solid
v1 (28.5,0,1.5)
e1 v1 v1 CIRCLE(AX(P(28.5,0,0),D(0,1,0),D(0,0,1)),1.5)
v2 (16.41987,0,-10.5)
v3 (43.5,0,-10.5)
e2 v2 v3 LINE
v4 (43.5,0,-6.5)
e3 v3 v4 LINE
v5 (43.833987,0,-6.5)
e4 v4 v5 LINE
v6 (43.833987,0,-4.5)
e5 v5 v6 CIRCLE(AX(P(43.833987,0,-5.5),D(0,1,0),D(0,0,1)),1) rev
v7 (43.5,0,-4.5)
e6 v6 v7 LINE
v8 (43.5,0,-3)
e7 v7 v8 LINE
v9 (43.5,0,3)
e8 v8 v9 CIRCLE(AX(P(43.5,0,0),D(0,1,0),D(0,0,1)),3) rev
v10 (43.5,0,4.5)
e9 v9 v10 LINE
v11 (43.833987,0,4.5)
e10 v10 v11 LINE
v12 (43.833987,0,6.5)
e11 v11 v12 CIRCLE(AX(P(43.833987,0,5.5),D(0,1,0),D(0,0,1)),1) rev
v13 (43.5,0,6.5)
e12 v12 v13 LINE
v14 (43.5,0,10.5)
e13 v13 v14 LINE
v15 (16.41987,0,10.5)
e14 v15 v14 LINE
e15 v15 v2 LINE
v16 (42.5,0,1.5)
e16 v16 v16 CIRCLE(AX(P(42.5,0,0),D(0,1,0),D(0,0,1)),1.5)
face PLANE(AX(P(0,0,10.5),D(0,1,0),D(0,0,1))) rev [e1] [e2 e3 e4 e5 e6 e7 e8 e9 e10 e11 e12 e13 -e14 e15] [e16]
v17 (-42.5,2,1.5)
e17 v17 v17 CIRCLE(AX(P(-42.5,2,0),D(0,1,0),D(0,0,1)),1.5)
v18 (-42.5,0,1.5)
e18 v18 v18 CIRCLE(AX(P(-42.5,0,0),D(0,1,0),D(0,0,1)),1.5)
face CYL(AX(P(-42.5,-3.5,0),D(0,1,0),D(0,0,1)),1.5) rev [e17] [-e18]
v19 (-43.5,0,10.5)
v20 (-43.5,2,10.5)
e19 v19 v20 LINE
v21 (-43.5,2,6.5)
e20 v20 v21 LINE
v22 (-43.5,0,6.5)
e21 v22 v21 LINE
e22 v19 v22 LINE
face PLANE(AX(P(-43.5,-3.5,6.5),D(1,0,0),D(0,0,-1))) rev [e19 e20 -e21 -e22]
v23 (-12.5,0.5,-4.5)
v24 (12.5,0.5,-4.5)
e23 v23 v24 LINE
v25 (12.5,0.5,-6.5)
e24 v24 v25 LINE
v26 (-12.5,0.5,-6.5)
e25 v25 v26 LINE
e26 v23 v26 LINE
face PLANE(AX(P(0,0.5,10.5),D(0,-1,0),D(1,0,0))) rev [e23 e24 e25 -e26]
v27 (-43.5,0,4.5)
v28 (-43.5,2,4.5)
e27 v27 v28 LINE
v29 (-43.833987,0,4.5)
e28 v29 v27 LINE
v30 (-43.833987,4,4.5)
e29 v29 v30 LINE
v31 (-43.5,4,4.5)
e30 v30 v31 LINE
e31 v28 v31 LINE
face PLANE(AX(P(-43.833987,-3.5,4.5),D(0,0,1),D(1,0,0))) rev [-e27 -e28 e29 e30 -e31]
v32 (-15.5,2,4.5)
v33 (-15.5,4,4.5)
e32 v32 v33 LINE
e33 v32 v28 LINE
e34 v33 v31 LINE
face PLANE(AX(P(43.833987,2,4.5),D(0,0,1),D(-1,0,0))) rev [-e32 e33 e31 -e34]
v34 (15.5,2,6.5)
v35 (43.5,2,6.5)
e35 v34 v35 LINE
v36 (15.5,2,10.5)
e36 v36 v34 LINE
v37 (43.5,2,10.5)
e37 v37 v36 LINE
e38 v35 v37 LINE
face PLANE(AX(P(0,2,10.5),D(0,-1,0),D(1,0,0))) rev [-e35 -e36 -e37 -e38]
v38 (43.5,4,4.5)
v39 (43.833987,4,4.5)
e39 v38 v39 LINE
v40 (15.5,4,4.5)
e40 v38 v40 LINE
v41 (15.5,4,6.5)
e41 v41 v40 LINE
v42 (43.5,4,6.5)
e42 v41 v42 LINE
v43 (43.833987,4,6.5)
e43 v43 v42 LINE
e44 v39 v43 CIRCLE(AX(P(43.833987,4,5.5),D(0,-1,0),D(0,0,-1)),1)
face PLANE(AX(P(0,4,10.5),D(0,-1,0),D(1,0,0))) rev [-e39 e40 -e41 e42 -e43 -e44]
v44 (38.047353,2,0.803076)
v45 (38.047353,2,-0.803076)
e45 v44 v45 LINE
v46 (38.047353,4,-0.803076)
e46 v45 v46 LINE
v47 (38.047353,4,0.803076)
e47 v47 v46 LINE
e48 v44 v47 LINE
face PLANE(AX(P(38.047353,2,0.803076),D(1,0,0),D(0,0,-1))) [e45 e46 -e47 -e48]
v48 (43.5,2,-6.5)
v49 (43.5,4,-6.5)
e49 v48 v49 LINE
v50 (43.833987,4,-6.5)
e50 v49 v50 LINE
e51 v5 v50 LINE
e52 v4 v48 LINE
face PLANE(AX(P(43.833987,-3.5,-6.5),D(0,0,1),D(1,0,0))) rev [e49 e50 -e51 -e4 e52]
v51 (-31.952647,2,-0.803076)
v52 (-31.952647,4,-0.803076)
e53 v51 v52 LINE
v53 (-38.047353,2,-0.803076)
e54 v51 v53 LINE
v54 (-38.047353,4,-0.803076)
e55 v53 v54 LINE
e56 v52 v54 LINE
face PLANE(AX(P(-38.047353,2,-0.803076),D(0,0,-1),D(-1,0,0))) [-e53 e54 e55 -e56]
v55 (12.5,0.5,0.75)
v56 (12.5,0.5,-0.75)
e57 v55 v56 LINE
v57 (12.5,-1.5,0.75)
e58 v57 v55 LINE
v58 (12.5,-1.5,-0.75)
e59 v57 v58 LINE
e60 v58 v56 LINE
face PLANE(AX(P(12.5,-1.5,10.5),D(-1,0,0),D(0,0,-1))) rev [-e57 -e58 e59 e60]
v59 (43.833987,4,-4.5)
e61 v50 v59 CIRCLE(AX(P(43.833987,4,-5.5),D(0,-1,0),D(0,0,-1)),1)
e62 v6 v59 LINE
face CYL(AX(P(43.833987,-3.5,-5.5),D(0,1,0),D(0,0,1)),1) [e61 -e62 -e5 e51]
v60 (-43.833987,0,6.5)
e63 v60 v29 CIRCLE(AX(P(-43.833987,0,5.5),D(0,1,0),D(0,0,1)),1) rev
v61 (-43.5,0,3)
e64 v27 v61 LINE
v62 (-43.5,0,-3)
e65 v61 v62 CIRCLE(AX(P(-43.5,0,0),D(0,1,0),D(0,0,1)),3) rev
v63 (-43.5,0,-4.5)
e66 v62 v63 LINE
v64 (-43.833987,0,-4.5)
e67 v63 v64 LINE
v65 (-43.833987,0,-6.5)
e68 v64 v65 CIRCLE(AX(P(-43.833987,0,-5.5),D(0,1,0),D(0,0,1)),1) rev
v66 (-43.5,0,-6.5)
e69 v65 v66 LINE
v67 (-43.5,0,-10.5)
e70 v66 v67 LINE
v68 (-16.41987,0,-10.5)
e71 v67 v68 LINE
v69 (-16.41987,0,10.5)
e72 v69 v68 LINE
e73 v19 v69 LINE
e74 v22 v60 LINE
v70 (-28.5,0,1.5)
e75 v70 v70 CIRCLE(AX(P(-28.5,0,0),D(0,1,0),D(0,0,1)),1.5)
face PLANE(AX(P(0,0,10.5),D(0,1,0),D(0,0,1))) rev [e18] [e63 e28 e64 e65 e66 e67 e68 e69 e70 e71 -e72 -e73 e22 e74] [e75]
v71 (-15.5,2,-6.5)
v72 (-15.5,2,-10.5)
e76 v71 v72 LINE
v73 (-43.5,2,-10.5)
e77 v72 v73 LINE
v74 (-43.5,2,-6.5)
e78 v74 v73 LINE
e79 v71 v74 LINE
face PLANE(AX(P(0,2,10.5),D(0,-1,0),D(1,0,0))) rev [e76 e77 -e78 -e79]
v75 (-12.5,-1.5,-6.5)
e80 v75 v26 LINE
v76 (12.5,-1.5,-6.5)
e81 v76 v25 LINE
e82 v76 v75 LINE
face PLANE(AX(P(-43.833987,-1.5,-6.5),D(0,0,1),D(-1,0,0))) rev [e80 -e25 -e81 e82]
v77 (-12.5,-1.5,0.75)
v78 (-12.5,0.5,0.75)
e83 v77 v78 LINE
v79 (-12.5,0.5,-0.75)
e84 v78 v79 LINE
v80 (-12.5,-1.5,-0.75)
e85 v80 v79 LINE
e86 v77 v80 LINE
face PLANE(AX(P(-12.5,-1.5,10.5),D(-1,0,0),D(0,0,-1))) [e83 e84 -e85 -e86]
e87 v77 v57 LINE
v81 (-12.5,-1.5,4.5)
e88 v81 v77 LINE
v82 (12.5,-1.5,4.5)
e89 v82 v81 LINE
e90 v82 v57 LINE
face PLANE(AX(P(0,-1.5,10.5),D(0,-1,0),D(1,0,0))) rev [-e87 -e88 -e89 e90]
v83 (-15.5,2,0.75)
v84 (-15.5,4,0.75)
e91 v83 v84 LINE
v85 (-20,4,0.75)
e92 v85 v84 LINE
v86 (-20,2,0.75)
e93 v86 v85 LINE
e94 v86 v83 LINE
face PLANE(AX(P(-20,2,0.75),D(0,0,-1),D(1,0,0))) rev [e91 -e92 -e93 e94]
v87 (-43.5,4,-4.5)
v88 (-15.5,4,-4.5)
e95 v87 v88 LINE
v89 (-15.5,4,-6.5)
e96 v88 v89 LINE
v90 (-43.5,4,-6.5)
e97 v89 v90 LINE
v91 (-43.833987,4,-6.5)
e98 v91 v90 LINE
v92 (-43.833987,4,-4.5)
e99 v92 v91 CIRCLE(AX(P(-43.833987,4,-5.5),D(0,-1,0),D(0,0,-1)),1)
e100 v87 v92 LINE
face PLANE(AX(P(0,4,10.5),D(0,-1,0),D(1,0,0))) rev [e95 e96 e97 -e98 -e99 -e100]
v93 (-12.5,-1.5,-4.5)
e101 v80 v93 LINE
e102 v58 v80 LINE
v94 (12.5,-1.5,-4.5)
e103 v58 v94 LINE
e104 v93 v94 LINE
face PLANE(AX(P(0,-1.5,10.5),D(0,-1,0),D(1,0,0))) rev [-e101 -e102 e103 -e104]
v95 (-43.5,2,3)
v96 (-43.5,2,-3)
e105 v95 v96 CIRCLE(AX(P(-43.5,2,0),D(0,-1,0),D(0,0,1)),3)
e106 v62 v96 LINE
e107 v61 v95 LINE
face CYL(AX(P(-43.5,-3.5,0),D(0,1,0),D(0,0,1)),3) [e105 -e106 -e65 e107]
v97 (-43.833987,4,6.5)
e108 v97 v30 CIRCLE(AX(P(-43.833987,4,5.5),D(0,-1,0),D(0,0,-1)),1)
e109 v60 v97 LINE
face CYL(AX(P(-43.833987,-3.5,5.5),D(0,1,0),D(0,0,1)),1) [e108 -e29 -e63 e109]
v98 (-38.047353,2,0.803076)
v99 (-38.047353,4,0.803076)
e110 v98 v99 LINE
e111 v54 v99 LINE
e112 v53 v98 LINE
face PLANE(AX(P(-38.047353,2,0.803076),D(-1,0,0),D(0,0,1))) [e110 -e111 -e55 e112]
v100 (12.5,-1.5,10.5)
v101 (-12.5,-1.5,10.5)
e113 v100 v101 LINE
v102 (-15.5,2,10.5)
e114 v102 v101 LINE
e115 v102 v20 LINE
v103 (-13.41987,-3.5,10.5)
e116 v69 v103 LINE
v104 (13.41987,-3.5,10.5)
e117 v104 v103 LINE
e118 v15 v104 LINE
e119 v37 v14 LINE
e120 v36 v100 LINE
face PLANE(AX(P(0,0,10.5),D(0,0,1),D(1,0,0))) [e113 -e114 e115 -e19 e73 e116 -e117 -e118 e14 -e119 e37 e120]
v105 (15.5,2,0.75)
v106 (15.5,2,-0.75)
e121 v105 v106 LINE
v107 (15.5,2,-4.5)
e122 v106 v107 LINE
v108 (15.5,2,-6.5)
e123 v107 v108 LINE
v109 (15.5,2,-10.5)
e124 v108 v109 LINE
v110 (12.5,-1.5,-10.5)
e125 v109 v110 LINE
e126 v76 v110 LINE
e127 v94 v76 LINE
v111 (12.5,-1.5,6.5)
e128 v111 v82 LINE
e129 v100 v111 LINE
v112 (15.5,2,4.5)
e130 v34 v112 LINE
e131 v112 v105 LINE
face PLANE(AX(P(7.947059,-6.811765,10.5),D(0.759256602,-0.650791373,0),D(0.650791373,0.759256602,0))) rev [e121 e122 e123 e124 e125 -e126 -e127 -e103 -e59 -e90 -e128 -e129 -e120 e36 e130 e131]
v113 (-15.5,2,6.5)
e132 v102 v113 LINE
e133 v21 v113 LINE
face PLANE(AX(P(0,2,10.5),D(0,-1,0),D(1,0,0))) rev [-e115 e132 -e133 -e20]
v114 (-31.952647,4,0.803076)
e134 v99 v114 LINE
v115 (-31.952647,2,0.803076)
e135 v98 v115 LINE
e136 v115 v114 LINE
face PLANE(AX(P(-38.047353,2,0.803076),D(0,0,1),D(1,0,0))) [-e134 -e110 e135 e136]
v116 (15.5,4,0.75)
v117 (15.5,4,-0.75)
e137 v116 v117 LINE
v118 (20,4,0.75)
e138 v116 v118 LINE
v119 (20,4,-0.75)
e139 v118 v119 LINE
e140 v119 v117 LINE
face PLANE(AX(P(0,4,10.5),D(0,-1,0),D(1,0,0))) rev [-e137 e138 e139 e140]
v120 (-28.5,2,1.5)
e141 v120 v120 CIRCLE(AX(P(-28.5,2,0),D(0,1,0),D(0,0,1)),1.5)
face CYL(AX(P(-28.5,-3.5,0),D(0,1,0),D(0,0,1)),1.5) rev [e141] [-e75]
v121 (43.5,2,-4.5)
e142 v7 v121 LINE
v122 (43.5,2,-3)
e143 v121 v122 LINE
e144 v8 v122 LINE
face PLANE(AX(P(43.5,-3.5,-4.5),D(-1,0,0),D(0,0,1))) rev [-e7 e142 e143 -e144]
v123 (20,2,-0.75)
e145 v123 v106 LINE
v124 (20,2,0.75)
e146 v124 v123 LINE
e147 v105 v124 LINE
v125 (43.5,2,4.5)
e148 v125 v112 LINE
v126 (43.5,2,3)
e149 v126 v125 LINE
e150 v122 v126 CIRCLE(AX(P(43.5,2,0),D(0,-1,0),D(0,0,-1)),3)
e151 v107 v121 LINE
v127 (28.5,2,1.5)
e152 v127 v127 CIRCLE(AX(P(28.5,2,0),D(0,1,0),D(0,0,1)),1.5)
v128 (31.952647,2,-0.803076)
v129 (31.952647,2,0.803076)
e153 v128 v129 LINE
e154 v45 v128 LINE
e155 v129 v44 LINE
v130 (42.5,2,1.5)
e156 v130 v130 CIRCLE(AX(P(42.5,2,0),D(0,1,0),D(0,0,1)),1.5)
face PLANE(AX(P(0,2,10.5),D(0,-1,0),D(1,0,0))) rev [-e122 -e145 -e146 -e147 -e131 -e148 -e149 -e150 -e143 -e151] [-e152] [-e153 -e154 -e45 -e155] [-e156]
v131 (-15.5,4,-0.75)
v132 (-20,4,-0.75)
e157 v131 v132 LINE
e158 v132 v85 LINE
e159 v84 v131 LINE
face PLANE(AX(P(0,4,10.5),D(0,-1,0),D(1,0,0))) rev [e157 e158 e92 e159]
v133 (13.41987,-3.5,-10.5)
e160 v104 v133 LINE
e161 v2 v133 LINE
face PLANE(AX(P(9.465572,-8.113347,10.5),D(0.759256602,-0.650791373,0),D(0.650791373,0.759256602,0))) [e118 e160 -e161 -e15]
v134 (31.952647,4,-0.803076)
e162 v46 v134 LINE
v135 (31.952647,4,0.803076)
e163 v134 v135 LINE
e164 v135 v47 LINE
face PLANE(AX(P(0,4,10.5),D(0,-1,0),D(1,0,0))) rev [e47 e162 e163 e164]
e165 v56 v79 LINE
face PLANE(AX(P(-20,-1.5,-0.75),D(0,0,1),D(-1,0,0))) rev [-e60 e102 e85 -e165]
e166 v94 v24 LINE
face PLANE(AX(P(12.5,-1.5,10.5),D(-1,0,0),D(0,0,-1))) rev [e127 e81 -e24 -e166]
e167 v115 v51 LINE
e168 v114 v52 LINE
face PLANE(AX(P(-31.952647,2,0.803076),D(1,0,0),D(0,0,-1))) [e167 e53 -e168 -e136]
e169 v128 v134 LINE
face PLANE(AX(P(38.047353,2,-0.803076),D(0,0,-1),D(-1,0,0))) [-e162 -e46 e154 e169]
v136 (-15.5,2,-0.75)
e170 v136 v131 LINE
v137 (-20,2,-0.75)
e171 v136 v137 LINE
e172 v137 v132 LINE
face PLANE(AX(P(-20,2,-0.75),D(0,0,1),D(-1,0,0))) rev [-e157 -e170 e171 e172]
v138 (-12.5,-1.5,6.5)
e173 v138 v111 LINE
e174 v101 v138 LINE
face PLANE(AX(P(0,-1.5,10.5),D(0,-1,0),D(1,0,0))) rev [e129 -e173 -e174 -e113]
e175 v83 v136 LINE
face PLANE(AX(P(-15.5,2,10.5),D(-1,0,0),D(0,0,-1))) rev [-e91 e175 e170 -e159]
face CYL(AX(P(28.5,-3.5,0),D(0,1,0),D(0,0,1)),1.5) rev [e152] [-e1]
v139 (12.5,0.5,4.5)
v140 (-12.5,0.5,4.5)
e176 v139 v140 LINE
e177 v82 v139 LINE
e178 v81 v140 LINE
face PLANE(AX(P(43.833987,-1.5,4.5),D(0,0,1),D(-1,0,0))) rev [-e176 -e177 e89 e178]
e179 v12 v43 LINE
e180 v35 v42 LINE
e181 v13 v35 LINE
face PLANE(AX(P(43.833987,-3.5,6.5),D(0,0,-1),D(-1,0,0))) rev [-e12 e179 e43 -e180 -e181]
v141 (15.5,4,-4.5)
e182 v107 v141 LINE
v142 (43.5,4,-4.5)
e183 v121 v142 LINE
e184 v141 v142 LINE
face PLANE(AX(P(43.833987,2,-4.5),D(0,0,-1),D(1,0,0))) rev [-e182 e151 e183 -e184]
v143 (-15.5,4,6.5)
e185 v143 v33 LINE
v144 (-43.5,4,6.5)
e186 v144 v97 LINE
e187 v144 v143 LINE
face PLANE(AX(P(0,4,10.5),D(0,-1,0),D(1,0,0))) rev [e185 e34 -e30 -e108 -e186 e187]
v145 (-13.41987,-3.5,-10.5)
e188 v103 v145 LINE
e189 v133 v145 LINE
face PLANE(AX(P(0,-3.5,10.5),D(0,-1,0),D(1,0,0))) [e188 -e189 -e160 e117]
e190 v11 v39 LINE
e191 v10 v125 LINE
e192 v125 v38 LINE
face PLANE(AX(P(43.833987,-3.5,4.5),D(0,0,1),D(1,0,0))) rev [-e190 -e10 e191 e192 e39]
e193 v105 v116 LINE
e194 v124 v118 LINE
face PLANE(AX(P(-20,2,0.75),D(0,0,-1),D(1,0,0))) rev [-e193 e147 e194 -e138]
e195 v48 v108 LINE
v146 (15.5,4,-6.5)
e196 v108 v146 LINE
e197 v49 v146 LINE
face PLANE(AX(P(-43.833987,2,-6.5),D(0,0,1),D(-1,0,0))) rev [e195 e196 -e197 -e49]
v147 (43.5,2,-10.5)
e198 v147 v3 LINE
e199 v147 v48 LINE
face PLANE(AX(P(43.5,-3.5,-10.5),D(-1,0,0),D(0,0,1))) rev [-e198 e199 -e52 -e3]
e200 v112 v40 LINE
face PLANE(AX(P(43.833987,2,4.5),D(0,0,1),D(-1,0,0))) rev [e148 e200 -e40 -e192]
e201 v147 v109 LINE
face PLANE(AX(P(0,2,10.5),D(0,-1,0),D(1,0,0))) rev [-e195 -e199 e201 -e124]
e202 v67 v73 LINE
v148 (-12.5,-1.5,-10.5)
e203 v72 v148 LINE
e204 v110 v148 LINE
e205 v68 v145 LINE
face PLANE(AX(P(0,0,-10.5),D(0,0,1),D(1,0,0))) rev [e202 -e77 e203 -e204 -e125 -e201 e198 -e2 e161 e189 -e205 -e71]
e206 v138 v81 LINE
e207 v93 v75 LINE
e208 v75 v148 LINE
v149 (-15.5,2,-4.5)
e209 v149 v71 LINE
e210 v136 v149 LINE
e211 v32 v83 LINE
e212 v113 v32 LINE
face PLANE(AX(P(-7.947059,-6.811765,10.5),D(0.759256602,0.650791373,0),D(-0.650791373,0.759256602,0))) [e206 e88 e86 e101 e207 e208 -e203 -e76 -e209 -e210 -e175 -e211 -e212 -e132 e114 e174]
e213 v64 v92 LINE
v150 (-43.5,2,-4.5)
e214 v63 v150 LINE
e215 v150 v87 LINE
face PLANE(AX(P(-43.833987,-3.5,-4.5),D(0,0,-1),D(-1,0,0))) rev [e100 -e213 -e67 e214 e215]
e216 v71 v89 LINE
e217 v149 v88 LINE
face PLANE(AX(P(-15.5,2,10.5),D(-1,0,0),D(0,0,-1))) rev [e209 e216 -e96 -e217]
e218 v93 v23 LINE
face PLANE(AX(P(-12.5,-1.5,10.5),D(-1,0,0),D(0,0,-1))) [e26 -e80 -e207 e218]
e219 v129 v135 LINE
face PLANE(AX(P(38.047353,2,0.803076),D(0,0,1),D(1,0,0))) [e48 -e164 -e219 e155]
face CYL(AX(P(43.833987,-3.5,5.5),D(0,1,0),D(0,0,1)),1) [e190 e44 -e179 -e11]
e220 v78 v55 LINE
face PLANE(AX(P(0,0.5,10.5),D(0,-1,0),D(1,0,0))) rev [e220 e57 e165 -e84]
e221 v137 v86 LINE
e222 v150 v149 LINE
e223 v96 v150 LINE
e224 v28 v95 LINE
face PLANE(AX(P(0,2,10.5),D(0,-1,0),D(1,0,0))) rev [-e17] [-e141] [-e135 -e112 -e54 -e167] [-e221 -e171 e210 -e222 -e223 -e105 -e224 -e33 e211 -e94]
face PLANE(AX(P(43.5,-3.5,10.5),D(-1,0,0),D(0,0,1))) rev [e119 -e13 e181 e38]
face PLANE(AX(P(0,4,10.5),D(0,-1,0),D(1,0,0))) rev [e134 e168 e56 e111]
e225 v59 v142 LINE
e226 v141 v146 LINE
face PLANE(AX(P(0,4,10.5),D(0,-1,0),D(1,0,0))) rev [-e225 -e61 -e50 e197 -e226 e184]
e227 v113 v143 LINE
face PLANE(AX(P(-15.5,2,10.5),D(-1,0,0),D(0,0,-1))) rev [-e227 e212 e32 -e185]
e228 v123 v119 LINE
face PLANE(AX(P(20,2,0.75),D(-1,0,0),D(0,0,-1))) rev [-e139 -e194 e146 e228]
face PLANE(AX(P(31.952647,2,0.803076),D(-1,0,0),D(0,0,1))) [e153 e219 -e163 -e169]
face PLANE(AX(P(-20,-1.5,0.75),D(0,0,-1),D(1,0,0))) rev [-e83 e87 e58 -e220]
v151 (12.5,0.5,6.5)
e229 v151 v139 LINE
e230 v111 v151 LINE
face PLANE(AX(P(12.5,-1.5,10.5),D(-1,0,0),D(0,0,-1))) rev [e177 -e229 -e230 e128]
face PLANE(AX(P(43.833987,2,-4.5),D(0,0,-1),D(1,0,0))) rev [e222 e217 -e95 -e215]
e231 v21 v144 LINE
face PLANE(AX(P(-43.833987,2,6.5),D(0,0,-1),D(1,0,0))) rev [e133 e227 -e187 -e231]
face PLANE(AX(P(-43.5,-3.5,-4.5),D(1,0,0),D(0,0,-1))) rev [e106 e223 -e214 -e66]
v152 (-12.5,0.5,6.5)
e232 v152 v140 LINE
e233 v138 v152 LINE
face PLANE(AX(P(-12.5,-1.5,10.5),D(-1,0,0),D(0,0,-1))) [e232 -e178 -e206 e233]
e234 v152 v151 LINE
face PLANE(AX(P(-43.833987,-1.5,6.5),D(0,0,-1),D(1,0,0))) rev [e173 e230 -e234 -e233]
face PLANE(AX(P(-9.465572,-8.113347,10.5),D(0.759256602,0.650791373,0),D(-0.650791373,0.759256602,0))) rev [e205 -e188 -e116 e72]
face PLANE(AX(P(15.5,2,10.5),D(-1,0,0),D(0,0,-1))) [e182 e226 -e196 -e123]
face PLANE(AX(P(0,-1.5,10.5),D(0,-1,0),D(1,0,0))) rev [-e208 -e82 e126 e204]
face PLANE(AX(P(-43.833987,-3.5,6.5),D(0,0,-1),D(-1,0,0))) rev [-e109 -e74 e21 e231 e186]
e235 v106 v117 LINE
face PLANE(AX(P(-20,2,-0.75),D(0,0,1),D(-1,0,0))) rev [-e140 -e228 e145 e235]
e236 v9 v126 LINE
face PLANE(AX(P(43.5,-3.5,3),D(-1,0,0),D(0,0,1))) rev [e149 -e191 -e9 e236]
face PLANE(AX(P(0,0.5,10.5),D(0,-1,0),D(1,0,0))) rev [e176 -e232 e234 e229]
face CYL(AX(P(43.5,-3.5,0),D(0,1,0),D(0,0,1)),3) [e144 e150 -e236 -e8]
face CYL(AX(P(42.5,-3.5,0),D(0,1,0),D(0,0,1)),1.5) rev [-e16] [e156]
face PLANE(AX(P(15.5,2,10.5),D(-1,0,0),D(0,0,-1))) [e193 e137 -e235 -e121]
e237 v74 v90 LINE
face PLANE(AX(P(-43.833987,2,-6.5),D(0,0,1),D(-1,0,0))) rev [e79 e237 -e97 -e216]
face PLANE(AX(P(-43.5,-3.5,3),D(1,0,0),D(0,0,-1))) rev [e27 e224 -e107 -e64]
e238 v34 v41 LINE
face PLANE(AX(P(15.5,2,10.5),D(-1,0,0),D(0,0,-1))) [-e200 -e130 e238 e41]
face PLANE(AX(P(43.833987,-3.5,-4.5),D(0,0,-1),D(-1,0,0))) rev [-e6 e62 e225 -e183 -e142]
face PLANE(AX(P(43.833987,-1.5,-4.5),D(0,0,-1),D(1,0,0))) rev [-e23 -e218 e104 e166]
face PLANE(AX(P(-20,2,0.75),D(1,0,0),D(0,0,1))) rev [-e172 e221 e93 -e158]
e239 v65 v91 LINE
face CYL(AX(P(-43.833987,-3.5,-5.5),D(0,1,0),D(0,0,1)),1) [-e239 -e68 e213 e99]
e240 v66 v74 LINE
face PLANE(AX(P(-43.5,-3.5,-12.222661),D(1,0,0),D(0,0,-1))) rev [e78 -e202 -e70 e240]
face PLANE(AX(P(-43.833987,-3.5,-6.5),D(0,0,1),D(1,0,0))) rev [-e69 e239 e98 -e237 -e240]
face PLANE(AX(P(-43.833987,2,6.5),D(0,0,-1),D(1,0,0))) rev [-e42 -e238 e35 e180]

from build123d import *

# Parameters (mm, degrees)
SALIENTE_EXTRUIR1_DEPTH = 10.5
CORTAR_EXTRUIR1_DEPTH   = 48.9869774
ENVOLVER1_OUTLINE_W     = 4.5
ENVOLVER1_OUTLINE_H     = 1.5
ENVOLVER1_OUTLINE_W_2   = 6.094706288
ENVOLVER1_OUTLINE_H_2   = 1.606152826
ENVOLVER1_DEPTH         = 2
ENVOLVER1_START         = -3.5
ENVOLVER1_2_OUTLINE_W   = 25
ENVOLVER1_2_OUTLINE_H   = 2
ENVOLVER1_2_OUTLINE_H_2 = 1.5
ENVOLVER1_2_DEPTH       = 2
CROQUIS5_R              = 1.5
CORTAR_EXTRUIR2_DEPTH   = 48.9869774


# Read off the part's stored shape, not the designer's step: Envolver1
with BuildPart() as part:
    # Croquis1 → Saliente-Extruir1 (new, symmetric)
    with BuildSketch(Plane.XY):
        Polygon((-46.5, 2), (-46.5, 0), (-16.419869845, 0), (-13.785714286, 0), (-15.5, 2), align=None)
        Polygon((-13.785714286, 0), (-16.419869845, 0), (-13.419869845, -3.5), (13.419869845, -3.5), (16.419869845, 0), (13.785714286, 0), (12.5, -1.5), (-12.5, -1.5), align=None)
        Polygon((15.5, 2), (13.785714286, 0), (16.419869845, 0), (46.5, 0), (46.5, 2), align=None)
    extrude(amount=SALIENTE_EXTRUIR1_DEPTH, both=True)

    # Croquis3 → Cortar-Extruir1 (cut, through all)
    with BuildSketch(Plane(origin=(0, 2, 0), x_dir=(1, 0, 0), z_dir=(0, 1, 0))):
        with BuildLine():
            Line((-43.833986837, -4.5), (-43.5, -4.5))
            Line((-43.5, -4.5), (-43.5, -3))
            ThreePointArc((-43.5, -3), (-46.5, 0), (-43.5, 3))
            Line((-43.5, 3), (-43.5, 4.5))
            Line((-43.5, 4.5), (-43.833986837, 4.5))
            ThreePointArc((-43.833986837, 4.5), (-44.833986837, 5.5), (-43.833986837, 6.5))
            Line((-43.833986837, 6.5), (-43.5, 6.5))
            Line((-43.5, 6.5), (-43.5, 10.5))
            Line((-43.5, 10.5), (-43.5, 12.222660865))
            Line((-43.5, 12.222660865), (-52.324213339, 12.222660865))
            Line((-52.324213339, 12.222660865), (-52.324213339, -12.147175549))
            Line((-52.324213339, -12.147175549), (-43.5, -12.147175549))
            Line((-43.5, -12.147175549), (-43.5, -10.5))
            Line((-43.5, -10.5), (-43.5, -6.5))
            Line((-43.5, -6.5), (-43.833986837, -6.5))
            ThreePointArc((-43.833986837, -6.5), (-44.833986837, -5.5), (-43.833986837, -4.5))
        make_face()
        with BuildLine():
            Line((43.5, 12.222660865), (43.5, 10.5))
            Line((43.5, 10.5), (43.5, 6.5))
            Line((43.5, 6.5), (43.833986837, 6.5))
            ThreePointArc((43.833986837, 6.5), (44.833986837, 5.5), (43.833986837, 4.5))
            Line((43.833986837, 4.5), (43.5, 4.5))
            Line((43.5, 4.5), (43.5, 3))
            ThreePointArc((43.5, 3), (46.5, 0), (43.5, -3))
            Line((43.5, -3), (43.5, -4.5))
            Line((43.5, -4.5), (43.833986837, -4.5))
            ThreePointArc((43.833986837, -4.5), (44.833986837, -5.5), (43.833986837, -6.5))
            Line((43.833986837, -6.5), (43.5, -6.5))
            Line((43.5, -6.5), (43.5, -10.5))
            Line((43.5, -10.5), (43.5, -12.147175549))
            Line((43.5, -12.147175549), (52.324213339, -12.147175549))
            Line((52.324213339, -12.147175549), (52.324213339, 12.222660865))
            Line((52.324213339, 12.222660865), (43.5, 12.222660865))
        make_face()
    extrude(amount=-CORTAR_EXTRUIR1_DEPTH, mode=Mode.SUBTRACT)

    # Envolver1 outline → Envolver1 (add)
    with BuildSketch(Plane(origin=(0, 2, 0), x_dir=(1, 0, 0), z_dir=(0, 1, 0))):
        with BuildLine():
            Line((-15.5, -4.5), (-43.833986837, -4.5))
            ThreePointArc((-43.833986837, -4.5), (-44.833986837, -5.5), (-43.833986837, -6.5))
            Line((-43.833986837, -6.5), (-15.5, -6.5))
            Line((-15.5, -6.5), (-15.5, -4.5))
        make_face()
        with BuildLine():
            Line((43.833986837, -4.5), (15.5, -4.5))
            Line((15.5, -4.5), (15.5, -6.5))
            Line((15.5, -6.5), (43.833986837, -6.5))
            ThreePointArc((43.833986837, -6.5), (44.833986837, -5.5), (43.833986837, -4.5))
        make_face()
        with BuildLine():
            Line((-15.5, 6.5), (-43.833986837, 6.5))
            ThreePointArc((-43.833986837, 6.5), (-44.833986837, 5.5), (-43.833986837, 4.5))
            Line((-43.833986837, 4.5), (-15.5, 4.5))
            Line((-15.5, 4.5), (-15.5, 6.5))
        make_face()
        with BuildLine():
            Line((43.833986837, 6.5), (15.5, 6.5))
            Line((15.5, 6.5), (15.5, 4.5))
            Line((15.5, 4.5), (43.833986837, 4.5))
            ThreePointArc((43.833986837, 4.5), (44.833986837, 5.5), (43.833986837, 6.5))
        make_face()
        with Locations((17.75, 0)):
            Rectangle(ENVOLVER1_OUTLINE_W, ENVOLVER1_OUTLINE_H)
        with Locations((-17.75, 0)):
            Rectangle(ENVOLVER1_OUTLINE_W, ENVOLVER1_OUTLINE_H)
        with Locations((35, 0)):
            Rectangle(ENVOLVER1_OUTLINE_W_2, ENVOLVER1_OUTLINE_H_2)
        with Locations((-35, 0)):
            Rectangle(ENVOLVER1_OUTLINE_W_2, ENVOLVER1_OUTLINE_H_2)
    extrude(amount=ENVOLVER1_DEPTH)

    # Envolver1 2 outline → Envolver1 2 (add)
    with BuildSketch(Plane(origin=(0, 2, 0), x_dir=(1, 0, 0), z_dir=(0, 1, 0)).offset(ENVOLVER1_START)):
        with Locations((0, -5.5)):
            Rectangle(ENVOLVER1_2_OUTLINE_W, ENVOLVER1_2_OUTLINE_H)
        with Locations((0, 5.5)):
            Rectangle(ENVOLVER1_2_OUTLINE_W, ENVOLVER1_2_OUTLINE_H)
        Rectangle(ENVOLVER1_2_OUTLINE_W, ENVOLVER1_2_OUTLINE_H_2)
    extrude(amount=ENVOLVER1_2_DEPTH)

    # Croquis5 → Cortar-Extruir2 (cut, through all)
    with BuildSketch(Plane(origin=(0, 2, 0), x_dir=(1, 0, 0), z_dir=(0, 1, 0))):
        with Locations(Location((-42.5, 0, 0), (0, 0, 270))):
            Circle(CROQUIS5_R)
        with Locations(Location((42.5, 0, 0), (0, 0, 270))):
            Circle(CROQUIS5_R)
        with Locations(Location((28.5, 0, 0), (0, 0, 270))):
            Circle(CROQUIS5_R)
        with Locations(Location((-28.5, 0, 0), (0, 0, 270))):
            Circle(CROQUIS5_R)
    extrude(amount=-CORTAR_EXTRUIR2_DEPTH, mode=Mode.SUBTRACT)


solid = part.part
